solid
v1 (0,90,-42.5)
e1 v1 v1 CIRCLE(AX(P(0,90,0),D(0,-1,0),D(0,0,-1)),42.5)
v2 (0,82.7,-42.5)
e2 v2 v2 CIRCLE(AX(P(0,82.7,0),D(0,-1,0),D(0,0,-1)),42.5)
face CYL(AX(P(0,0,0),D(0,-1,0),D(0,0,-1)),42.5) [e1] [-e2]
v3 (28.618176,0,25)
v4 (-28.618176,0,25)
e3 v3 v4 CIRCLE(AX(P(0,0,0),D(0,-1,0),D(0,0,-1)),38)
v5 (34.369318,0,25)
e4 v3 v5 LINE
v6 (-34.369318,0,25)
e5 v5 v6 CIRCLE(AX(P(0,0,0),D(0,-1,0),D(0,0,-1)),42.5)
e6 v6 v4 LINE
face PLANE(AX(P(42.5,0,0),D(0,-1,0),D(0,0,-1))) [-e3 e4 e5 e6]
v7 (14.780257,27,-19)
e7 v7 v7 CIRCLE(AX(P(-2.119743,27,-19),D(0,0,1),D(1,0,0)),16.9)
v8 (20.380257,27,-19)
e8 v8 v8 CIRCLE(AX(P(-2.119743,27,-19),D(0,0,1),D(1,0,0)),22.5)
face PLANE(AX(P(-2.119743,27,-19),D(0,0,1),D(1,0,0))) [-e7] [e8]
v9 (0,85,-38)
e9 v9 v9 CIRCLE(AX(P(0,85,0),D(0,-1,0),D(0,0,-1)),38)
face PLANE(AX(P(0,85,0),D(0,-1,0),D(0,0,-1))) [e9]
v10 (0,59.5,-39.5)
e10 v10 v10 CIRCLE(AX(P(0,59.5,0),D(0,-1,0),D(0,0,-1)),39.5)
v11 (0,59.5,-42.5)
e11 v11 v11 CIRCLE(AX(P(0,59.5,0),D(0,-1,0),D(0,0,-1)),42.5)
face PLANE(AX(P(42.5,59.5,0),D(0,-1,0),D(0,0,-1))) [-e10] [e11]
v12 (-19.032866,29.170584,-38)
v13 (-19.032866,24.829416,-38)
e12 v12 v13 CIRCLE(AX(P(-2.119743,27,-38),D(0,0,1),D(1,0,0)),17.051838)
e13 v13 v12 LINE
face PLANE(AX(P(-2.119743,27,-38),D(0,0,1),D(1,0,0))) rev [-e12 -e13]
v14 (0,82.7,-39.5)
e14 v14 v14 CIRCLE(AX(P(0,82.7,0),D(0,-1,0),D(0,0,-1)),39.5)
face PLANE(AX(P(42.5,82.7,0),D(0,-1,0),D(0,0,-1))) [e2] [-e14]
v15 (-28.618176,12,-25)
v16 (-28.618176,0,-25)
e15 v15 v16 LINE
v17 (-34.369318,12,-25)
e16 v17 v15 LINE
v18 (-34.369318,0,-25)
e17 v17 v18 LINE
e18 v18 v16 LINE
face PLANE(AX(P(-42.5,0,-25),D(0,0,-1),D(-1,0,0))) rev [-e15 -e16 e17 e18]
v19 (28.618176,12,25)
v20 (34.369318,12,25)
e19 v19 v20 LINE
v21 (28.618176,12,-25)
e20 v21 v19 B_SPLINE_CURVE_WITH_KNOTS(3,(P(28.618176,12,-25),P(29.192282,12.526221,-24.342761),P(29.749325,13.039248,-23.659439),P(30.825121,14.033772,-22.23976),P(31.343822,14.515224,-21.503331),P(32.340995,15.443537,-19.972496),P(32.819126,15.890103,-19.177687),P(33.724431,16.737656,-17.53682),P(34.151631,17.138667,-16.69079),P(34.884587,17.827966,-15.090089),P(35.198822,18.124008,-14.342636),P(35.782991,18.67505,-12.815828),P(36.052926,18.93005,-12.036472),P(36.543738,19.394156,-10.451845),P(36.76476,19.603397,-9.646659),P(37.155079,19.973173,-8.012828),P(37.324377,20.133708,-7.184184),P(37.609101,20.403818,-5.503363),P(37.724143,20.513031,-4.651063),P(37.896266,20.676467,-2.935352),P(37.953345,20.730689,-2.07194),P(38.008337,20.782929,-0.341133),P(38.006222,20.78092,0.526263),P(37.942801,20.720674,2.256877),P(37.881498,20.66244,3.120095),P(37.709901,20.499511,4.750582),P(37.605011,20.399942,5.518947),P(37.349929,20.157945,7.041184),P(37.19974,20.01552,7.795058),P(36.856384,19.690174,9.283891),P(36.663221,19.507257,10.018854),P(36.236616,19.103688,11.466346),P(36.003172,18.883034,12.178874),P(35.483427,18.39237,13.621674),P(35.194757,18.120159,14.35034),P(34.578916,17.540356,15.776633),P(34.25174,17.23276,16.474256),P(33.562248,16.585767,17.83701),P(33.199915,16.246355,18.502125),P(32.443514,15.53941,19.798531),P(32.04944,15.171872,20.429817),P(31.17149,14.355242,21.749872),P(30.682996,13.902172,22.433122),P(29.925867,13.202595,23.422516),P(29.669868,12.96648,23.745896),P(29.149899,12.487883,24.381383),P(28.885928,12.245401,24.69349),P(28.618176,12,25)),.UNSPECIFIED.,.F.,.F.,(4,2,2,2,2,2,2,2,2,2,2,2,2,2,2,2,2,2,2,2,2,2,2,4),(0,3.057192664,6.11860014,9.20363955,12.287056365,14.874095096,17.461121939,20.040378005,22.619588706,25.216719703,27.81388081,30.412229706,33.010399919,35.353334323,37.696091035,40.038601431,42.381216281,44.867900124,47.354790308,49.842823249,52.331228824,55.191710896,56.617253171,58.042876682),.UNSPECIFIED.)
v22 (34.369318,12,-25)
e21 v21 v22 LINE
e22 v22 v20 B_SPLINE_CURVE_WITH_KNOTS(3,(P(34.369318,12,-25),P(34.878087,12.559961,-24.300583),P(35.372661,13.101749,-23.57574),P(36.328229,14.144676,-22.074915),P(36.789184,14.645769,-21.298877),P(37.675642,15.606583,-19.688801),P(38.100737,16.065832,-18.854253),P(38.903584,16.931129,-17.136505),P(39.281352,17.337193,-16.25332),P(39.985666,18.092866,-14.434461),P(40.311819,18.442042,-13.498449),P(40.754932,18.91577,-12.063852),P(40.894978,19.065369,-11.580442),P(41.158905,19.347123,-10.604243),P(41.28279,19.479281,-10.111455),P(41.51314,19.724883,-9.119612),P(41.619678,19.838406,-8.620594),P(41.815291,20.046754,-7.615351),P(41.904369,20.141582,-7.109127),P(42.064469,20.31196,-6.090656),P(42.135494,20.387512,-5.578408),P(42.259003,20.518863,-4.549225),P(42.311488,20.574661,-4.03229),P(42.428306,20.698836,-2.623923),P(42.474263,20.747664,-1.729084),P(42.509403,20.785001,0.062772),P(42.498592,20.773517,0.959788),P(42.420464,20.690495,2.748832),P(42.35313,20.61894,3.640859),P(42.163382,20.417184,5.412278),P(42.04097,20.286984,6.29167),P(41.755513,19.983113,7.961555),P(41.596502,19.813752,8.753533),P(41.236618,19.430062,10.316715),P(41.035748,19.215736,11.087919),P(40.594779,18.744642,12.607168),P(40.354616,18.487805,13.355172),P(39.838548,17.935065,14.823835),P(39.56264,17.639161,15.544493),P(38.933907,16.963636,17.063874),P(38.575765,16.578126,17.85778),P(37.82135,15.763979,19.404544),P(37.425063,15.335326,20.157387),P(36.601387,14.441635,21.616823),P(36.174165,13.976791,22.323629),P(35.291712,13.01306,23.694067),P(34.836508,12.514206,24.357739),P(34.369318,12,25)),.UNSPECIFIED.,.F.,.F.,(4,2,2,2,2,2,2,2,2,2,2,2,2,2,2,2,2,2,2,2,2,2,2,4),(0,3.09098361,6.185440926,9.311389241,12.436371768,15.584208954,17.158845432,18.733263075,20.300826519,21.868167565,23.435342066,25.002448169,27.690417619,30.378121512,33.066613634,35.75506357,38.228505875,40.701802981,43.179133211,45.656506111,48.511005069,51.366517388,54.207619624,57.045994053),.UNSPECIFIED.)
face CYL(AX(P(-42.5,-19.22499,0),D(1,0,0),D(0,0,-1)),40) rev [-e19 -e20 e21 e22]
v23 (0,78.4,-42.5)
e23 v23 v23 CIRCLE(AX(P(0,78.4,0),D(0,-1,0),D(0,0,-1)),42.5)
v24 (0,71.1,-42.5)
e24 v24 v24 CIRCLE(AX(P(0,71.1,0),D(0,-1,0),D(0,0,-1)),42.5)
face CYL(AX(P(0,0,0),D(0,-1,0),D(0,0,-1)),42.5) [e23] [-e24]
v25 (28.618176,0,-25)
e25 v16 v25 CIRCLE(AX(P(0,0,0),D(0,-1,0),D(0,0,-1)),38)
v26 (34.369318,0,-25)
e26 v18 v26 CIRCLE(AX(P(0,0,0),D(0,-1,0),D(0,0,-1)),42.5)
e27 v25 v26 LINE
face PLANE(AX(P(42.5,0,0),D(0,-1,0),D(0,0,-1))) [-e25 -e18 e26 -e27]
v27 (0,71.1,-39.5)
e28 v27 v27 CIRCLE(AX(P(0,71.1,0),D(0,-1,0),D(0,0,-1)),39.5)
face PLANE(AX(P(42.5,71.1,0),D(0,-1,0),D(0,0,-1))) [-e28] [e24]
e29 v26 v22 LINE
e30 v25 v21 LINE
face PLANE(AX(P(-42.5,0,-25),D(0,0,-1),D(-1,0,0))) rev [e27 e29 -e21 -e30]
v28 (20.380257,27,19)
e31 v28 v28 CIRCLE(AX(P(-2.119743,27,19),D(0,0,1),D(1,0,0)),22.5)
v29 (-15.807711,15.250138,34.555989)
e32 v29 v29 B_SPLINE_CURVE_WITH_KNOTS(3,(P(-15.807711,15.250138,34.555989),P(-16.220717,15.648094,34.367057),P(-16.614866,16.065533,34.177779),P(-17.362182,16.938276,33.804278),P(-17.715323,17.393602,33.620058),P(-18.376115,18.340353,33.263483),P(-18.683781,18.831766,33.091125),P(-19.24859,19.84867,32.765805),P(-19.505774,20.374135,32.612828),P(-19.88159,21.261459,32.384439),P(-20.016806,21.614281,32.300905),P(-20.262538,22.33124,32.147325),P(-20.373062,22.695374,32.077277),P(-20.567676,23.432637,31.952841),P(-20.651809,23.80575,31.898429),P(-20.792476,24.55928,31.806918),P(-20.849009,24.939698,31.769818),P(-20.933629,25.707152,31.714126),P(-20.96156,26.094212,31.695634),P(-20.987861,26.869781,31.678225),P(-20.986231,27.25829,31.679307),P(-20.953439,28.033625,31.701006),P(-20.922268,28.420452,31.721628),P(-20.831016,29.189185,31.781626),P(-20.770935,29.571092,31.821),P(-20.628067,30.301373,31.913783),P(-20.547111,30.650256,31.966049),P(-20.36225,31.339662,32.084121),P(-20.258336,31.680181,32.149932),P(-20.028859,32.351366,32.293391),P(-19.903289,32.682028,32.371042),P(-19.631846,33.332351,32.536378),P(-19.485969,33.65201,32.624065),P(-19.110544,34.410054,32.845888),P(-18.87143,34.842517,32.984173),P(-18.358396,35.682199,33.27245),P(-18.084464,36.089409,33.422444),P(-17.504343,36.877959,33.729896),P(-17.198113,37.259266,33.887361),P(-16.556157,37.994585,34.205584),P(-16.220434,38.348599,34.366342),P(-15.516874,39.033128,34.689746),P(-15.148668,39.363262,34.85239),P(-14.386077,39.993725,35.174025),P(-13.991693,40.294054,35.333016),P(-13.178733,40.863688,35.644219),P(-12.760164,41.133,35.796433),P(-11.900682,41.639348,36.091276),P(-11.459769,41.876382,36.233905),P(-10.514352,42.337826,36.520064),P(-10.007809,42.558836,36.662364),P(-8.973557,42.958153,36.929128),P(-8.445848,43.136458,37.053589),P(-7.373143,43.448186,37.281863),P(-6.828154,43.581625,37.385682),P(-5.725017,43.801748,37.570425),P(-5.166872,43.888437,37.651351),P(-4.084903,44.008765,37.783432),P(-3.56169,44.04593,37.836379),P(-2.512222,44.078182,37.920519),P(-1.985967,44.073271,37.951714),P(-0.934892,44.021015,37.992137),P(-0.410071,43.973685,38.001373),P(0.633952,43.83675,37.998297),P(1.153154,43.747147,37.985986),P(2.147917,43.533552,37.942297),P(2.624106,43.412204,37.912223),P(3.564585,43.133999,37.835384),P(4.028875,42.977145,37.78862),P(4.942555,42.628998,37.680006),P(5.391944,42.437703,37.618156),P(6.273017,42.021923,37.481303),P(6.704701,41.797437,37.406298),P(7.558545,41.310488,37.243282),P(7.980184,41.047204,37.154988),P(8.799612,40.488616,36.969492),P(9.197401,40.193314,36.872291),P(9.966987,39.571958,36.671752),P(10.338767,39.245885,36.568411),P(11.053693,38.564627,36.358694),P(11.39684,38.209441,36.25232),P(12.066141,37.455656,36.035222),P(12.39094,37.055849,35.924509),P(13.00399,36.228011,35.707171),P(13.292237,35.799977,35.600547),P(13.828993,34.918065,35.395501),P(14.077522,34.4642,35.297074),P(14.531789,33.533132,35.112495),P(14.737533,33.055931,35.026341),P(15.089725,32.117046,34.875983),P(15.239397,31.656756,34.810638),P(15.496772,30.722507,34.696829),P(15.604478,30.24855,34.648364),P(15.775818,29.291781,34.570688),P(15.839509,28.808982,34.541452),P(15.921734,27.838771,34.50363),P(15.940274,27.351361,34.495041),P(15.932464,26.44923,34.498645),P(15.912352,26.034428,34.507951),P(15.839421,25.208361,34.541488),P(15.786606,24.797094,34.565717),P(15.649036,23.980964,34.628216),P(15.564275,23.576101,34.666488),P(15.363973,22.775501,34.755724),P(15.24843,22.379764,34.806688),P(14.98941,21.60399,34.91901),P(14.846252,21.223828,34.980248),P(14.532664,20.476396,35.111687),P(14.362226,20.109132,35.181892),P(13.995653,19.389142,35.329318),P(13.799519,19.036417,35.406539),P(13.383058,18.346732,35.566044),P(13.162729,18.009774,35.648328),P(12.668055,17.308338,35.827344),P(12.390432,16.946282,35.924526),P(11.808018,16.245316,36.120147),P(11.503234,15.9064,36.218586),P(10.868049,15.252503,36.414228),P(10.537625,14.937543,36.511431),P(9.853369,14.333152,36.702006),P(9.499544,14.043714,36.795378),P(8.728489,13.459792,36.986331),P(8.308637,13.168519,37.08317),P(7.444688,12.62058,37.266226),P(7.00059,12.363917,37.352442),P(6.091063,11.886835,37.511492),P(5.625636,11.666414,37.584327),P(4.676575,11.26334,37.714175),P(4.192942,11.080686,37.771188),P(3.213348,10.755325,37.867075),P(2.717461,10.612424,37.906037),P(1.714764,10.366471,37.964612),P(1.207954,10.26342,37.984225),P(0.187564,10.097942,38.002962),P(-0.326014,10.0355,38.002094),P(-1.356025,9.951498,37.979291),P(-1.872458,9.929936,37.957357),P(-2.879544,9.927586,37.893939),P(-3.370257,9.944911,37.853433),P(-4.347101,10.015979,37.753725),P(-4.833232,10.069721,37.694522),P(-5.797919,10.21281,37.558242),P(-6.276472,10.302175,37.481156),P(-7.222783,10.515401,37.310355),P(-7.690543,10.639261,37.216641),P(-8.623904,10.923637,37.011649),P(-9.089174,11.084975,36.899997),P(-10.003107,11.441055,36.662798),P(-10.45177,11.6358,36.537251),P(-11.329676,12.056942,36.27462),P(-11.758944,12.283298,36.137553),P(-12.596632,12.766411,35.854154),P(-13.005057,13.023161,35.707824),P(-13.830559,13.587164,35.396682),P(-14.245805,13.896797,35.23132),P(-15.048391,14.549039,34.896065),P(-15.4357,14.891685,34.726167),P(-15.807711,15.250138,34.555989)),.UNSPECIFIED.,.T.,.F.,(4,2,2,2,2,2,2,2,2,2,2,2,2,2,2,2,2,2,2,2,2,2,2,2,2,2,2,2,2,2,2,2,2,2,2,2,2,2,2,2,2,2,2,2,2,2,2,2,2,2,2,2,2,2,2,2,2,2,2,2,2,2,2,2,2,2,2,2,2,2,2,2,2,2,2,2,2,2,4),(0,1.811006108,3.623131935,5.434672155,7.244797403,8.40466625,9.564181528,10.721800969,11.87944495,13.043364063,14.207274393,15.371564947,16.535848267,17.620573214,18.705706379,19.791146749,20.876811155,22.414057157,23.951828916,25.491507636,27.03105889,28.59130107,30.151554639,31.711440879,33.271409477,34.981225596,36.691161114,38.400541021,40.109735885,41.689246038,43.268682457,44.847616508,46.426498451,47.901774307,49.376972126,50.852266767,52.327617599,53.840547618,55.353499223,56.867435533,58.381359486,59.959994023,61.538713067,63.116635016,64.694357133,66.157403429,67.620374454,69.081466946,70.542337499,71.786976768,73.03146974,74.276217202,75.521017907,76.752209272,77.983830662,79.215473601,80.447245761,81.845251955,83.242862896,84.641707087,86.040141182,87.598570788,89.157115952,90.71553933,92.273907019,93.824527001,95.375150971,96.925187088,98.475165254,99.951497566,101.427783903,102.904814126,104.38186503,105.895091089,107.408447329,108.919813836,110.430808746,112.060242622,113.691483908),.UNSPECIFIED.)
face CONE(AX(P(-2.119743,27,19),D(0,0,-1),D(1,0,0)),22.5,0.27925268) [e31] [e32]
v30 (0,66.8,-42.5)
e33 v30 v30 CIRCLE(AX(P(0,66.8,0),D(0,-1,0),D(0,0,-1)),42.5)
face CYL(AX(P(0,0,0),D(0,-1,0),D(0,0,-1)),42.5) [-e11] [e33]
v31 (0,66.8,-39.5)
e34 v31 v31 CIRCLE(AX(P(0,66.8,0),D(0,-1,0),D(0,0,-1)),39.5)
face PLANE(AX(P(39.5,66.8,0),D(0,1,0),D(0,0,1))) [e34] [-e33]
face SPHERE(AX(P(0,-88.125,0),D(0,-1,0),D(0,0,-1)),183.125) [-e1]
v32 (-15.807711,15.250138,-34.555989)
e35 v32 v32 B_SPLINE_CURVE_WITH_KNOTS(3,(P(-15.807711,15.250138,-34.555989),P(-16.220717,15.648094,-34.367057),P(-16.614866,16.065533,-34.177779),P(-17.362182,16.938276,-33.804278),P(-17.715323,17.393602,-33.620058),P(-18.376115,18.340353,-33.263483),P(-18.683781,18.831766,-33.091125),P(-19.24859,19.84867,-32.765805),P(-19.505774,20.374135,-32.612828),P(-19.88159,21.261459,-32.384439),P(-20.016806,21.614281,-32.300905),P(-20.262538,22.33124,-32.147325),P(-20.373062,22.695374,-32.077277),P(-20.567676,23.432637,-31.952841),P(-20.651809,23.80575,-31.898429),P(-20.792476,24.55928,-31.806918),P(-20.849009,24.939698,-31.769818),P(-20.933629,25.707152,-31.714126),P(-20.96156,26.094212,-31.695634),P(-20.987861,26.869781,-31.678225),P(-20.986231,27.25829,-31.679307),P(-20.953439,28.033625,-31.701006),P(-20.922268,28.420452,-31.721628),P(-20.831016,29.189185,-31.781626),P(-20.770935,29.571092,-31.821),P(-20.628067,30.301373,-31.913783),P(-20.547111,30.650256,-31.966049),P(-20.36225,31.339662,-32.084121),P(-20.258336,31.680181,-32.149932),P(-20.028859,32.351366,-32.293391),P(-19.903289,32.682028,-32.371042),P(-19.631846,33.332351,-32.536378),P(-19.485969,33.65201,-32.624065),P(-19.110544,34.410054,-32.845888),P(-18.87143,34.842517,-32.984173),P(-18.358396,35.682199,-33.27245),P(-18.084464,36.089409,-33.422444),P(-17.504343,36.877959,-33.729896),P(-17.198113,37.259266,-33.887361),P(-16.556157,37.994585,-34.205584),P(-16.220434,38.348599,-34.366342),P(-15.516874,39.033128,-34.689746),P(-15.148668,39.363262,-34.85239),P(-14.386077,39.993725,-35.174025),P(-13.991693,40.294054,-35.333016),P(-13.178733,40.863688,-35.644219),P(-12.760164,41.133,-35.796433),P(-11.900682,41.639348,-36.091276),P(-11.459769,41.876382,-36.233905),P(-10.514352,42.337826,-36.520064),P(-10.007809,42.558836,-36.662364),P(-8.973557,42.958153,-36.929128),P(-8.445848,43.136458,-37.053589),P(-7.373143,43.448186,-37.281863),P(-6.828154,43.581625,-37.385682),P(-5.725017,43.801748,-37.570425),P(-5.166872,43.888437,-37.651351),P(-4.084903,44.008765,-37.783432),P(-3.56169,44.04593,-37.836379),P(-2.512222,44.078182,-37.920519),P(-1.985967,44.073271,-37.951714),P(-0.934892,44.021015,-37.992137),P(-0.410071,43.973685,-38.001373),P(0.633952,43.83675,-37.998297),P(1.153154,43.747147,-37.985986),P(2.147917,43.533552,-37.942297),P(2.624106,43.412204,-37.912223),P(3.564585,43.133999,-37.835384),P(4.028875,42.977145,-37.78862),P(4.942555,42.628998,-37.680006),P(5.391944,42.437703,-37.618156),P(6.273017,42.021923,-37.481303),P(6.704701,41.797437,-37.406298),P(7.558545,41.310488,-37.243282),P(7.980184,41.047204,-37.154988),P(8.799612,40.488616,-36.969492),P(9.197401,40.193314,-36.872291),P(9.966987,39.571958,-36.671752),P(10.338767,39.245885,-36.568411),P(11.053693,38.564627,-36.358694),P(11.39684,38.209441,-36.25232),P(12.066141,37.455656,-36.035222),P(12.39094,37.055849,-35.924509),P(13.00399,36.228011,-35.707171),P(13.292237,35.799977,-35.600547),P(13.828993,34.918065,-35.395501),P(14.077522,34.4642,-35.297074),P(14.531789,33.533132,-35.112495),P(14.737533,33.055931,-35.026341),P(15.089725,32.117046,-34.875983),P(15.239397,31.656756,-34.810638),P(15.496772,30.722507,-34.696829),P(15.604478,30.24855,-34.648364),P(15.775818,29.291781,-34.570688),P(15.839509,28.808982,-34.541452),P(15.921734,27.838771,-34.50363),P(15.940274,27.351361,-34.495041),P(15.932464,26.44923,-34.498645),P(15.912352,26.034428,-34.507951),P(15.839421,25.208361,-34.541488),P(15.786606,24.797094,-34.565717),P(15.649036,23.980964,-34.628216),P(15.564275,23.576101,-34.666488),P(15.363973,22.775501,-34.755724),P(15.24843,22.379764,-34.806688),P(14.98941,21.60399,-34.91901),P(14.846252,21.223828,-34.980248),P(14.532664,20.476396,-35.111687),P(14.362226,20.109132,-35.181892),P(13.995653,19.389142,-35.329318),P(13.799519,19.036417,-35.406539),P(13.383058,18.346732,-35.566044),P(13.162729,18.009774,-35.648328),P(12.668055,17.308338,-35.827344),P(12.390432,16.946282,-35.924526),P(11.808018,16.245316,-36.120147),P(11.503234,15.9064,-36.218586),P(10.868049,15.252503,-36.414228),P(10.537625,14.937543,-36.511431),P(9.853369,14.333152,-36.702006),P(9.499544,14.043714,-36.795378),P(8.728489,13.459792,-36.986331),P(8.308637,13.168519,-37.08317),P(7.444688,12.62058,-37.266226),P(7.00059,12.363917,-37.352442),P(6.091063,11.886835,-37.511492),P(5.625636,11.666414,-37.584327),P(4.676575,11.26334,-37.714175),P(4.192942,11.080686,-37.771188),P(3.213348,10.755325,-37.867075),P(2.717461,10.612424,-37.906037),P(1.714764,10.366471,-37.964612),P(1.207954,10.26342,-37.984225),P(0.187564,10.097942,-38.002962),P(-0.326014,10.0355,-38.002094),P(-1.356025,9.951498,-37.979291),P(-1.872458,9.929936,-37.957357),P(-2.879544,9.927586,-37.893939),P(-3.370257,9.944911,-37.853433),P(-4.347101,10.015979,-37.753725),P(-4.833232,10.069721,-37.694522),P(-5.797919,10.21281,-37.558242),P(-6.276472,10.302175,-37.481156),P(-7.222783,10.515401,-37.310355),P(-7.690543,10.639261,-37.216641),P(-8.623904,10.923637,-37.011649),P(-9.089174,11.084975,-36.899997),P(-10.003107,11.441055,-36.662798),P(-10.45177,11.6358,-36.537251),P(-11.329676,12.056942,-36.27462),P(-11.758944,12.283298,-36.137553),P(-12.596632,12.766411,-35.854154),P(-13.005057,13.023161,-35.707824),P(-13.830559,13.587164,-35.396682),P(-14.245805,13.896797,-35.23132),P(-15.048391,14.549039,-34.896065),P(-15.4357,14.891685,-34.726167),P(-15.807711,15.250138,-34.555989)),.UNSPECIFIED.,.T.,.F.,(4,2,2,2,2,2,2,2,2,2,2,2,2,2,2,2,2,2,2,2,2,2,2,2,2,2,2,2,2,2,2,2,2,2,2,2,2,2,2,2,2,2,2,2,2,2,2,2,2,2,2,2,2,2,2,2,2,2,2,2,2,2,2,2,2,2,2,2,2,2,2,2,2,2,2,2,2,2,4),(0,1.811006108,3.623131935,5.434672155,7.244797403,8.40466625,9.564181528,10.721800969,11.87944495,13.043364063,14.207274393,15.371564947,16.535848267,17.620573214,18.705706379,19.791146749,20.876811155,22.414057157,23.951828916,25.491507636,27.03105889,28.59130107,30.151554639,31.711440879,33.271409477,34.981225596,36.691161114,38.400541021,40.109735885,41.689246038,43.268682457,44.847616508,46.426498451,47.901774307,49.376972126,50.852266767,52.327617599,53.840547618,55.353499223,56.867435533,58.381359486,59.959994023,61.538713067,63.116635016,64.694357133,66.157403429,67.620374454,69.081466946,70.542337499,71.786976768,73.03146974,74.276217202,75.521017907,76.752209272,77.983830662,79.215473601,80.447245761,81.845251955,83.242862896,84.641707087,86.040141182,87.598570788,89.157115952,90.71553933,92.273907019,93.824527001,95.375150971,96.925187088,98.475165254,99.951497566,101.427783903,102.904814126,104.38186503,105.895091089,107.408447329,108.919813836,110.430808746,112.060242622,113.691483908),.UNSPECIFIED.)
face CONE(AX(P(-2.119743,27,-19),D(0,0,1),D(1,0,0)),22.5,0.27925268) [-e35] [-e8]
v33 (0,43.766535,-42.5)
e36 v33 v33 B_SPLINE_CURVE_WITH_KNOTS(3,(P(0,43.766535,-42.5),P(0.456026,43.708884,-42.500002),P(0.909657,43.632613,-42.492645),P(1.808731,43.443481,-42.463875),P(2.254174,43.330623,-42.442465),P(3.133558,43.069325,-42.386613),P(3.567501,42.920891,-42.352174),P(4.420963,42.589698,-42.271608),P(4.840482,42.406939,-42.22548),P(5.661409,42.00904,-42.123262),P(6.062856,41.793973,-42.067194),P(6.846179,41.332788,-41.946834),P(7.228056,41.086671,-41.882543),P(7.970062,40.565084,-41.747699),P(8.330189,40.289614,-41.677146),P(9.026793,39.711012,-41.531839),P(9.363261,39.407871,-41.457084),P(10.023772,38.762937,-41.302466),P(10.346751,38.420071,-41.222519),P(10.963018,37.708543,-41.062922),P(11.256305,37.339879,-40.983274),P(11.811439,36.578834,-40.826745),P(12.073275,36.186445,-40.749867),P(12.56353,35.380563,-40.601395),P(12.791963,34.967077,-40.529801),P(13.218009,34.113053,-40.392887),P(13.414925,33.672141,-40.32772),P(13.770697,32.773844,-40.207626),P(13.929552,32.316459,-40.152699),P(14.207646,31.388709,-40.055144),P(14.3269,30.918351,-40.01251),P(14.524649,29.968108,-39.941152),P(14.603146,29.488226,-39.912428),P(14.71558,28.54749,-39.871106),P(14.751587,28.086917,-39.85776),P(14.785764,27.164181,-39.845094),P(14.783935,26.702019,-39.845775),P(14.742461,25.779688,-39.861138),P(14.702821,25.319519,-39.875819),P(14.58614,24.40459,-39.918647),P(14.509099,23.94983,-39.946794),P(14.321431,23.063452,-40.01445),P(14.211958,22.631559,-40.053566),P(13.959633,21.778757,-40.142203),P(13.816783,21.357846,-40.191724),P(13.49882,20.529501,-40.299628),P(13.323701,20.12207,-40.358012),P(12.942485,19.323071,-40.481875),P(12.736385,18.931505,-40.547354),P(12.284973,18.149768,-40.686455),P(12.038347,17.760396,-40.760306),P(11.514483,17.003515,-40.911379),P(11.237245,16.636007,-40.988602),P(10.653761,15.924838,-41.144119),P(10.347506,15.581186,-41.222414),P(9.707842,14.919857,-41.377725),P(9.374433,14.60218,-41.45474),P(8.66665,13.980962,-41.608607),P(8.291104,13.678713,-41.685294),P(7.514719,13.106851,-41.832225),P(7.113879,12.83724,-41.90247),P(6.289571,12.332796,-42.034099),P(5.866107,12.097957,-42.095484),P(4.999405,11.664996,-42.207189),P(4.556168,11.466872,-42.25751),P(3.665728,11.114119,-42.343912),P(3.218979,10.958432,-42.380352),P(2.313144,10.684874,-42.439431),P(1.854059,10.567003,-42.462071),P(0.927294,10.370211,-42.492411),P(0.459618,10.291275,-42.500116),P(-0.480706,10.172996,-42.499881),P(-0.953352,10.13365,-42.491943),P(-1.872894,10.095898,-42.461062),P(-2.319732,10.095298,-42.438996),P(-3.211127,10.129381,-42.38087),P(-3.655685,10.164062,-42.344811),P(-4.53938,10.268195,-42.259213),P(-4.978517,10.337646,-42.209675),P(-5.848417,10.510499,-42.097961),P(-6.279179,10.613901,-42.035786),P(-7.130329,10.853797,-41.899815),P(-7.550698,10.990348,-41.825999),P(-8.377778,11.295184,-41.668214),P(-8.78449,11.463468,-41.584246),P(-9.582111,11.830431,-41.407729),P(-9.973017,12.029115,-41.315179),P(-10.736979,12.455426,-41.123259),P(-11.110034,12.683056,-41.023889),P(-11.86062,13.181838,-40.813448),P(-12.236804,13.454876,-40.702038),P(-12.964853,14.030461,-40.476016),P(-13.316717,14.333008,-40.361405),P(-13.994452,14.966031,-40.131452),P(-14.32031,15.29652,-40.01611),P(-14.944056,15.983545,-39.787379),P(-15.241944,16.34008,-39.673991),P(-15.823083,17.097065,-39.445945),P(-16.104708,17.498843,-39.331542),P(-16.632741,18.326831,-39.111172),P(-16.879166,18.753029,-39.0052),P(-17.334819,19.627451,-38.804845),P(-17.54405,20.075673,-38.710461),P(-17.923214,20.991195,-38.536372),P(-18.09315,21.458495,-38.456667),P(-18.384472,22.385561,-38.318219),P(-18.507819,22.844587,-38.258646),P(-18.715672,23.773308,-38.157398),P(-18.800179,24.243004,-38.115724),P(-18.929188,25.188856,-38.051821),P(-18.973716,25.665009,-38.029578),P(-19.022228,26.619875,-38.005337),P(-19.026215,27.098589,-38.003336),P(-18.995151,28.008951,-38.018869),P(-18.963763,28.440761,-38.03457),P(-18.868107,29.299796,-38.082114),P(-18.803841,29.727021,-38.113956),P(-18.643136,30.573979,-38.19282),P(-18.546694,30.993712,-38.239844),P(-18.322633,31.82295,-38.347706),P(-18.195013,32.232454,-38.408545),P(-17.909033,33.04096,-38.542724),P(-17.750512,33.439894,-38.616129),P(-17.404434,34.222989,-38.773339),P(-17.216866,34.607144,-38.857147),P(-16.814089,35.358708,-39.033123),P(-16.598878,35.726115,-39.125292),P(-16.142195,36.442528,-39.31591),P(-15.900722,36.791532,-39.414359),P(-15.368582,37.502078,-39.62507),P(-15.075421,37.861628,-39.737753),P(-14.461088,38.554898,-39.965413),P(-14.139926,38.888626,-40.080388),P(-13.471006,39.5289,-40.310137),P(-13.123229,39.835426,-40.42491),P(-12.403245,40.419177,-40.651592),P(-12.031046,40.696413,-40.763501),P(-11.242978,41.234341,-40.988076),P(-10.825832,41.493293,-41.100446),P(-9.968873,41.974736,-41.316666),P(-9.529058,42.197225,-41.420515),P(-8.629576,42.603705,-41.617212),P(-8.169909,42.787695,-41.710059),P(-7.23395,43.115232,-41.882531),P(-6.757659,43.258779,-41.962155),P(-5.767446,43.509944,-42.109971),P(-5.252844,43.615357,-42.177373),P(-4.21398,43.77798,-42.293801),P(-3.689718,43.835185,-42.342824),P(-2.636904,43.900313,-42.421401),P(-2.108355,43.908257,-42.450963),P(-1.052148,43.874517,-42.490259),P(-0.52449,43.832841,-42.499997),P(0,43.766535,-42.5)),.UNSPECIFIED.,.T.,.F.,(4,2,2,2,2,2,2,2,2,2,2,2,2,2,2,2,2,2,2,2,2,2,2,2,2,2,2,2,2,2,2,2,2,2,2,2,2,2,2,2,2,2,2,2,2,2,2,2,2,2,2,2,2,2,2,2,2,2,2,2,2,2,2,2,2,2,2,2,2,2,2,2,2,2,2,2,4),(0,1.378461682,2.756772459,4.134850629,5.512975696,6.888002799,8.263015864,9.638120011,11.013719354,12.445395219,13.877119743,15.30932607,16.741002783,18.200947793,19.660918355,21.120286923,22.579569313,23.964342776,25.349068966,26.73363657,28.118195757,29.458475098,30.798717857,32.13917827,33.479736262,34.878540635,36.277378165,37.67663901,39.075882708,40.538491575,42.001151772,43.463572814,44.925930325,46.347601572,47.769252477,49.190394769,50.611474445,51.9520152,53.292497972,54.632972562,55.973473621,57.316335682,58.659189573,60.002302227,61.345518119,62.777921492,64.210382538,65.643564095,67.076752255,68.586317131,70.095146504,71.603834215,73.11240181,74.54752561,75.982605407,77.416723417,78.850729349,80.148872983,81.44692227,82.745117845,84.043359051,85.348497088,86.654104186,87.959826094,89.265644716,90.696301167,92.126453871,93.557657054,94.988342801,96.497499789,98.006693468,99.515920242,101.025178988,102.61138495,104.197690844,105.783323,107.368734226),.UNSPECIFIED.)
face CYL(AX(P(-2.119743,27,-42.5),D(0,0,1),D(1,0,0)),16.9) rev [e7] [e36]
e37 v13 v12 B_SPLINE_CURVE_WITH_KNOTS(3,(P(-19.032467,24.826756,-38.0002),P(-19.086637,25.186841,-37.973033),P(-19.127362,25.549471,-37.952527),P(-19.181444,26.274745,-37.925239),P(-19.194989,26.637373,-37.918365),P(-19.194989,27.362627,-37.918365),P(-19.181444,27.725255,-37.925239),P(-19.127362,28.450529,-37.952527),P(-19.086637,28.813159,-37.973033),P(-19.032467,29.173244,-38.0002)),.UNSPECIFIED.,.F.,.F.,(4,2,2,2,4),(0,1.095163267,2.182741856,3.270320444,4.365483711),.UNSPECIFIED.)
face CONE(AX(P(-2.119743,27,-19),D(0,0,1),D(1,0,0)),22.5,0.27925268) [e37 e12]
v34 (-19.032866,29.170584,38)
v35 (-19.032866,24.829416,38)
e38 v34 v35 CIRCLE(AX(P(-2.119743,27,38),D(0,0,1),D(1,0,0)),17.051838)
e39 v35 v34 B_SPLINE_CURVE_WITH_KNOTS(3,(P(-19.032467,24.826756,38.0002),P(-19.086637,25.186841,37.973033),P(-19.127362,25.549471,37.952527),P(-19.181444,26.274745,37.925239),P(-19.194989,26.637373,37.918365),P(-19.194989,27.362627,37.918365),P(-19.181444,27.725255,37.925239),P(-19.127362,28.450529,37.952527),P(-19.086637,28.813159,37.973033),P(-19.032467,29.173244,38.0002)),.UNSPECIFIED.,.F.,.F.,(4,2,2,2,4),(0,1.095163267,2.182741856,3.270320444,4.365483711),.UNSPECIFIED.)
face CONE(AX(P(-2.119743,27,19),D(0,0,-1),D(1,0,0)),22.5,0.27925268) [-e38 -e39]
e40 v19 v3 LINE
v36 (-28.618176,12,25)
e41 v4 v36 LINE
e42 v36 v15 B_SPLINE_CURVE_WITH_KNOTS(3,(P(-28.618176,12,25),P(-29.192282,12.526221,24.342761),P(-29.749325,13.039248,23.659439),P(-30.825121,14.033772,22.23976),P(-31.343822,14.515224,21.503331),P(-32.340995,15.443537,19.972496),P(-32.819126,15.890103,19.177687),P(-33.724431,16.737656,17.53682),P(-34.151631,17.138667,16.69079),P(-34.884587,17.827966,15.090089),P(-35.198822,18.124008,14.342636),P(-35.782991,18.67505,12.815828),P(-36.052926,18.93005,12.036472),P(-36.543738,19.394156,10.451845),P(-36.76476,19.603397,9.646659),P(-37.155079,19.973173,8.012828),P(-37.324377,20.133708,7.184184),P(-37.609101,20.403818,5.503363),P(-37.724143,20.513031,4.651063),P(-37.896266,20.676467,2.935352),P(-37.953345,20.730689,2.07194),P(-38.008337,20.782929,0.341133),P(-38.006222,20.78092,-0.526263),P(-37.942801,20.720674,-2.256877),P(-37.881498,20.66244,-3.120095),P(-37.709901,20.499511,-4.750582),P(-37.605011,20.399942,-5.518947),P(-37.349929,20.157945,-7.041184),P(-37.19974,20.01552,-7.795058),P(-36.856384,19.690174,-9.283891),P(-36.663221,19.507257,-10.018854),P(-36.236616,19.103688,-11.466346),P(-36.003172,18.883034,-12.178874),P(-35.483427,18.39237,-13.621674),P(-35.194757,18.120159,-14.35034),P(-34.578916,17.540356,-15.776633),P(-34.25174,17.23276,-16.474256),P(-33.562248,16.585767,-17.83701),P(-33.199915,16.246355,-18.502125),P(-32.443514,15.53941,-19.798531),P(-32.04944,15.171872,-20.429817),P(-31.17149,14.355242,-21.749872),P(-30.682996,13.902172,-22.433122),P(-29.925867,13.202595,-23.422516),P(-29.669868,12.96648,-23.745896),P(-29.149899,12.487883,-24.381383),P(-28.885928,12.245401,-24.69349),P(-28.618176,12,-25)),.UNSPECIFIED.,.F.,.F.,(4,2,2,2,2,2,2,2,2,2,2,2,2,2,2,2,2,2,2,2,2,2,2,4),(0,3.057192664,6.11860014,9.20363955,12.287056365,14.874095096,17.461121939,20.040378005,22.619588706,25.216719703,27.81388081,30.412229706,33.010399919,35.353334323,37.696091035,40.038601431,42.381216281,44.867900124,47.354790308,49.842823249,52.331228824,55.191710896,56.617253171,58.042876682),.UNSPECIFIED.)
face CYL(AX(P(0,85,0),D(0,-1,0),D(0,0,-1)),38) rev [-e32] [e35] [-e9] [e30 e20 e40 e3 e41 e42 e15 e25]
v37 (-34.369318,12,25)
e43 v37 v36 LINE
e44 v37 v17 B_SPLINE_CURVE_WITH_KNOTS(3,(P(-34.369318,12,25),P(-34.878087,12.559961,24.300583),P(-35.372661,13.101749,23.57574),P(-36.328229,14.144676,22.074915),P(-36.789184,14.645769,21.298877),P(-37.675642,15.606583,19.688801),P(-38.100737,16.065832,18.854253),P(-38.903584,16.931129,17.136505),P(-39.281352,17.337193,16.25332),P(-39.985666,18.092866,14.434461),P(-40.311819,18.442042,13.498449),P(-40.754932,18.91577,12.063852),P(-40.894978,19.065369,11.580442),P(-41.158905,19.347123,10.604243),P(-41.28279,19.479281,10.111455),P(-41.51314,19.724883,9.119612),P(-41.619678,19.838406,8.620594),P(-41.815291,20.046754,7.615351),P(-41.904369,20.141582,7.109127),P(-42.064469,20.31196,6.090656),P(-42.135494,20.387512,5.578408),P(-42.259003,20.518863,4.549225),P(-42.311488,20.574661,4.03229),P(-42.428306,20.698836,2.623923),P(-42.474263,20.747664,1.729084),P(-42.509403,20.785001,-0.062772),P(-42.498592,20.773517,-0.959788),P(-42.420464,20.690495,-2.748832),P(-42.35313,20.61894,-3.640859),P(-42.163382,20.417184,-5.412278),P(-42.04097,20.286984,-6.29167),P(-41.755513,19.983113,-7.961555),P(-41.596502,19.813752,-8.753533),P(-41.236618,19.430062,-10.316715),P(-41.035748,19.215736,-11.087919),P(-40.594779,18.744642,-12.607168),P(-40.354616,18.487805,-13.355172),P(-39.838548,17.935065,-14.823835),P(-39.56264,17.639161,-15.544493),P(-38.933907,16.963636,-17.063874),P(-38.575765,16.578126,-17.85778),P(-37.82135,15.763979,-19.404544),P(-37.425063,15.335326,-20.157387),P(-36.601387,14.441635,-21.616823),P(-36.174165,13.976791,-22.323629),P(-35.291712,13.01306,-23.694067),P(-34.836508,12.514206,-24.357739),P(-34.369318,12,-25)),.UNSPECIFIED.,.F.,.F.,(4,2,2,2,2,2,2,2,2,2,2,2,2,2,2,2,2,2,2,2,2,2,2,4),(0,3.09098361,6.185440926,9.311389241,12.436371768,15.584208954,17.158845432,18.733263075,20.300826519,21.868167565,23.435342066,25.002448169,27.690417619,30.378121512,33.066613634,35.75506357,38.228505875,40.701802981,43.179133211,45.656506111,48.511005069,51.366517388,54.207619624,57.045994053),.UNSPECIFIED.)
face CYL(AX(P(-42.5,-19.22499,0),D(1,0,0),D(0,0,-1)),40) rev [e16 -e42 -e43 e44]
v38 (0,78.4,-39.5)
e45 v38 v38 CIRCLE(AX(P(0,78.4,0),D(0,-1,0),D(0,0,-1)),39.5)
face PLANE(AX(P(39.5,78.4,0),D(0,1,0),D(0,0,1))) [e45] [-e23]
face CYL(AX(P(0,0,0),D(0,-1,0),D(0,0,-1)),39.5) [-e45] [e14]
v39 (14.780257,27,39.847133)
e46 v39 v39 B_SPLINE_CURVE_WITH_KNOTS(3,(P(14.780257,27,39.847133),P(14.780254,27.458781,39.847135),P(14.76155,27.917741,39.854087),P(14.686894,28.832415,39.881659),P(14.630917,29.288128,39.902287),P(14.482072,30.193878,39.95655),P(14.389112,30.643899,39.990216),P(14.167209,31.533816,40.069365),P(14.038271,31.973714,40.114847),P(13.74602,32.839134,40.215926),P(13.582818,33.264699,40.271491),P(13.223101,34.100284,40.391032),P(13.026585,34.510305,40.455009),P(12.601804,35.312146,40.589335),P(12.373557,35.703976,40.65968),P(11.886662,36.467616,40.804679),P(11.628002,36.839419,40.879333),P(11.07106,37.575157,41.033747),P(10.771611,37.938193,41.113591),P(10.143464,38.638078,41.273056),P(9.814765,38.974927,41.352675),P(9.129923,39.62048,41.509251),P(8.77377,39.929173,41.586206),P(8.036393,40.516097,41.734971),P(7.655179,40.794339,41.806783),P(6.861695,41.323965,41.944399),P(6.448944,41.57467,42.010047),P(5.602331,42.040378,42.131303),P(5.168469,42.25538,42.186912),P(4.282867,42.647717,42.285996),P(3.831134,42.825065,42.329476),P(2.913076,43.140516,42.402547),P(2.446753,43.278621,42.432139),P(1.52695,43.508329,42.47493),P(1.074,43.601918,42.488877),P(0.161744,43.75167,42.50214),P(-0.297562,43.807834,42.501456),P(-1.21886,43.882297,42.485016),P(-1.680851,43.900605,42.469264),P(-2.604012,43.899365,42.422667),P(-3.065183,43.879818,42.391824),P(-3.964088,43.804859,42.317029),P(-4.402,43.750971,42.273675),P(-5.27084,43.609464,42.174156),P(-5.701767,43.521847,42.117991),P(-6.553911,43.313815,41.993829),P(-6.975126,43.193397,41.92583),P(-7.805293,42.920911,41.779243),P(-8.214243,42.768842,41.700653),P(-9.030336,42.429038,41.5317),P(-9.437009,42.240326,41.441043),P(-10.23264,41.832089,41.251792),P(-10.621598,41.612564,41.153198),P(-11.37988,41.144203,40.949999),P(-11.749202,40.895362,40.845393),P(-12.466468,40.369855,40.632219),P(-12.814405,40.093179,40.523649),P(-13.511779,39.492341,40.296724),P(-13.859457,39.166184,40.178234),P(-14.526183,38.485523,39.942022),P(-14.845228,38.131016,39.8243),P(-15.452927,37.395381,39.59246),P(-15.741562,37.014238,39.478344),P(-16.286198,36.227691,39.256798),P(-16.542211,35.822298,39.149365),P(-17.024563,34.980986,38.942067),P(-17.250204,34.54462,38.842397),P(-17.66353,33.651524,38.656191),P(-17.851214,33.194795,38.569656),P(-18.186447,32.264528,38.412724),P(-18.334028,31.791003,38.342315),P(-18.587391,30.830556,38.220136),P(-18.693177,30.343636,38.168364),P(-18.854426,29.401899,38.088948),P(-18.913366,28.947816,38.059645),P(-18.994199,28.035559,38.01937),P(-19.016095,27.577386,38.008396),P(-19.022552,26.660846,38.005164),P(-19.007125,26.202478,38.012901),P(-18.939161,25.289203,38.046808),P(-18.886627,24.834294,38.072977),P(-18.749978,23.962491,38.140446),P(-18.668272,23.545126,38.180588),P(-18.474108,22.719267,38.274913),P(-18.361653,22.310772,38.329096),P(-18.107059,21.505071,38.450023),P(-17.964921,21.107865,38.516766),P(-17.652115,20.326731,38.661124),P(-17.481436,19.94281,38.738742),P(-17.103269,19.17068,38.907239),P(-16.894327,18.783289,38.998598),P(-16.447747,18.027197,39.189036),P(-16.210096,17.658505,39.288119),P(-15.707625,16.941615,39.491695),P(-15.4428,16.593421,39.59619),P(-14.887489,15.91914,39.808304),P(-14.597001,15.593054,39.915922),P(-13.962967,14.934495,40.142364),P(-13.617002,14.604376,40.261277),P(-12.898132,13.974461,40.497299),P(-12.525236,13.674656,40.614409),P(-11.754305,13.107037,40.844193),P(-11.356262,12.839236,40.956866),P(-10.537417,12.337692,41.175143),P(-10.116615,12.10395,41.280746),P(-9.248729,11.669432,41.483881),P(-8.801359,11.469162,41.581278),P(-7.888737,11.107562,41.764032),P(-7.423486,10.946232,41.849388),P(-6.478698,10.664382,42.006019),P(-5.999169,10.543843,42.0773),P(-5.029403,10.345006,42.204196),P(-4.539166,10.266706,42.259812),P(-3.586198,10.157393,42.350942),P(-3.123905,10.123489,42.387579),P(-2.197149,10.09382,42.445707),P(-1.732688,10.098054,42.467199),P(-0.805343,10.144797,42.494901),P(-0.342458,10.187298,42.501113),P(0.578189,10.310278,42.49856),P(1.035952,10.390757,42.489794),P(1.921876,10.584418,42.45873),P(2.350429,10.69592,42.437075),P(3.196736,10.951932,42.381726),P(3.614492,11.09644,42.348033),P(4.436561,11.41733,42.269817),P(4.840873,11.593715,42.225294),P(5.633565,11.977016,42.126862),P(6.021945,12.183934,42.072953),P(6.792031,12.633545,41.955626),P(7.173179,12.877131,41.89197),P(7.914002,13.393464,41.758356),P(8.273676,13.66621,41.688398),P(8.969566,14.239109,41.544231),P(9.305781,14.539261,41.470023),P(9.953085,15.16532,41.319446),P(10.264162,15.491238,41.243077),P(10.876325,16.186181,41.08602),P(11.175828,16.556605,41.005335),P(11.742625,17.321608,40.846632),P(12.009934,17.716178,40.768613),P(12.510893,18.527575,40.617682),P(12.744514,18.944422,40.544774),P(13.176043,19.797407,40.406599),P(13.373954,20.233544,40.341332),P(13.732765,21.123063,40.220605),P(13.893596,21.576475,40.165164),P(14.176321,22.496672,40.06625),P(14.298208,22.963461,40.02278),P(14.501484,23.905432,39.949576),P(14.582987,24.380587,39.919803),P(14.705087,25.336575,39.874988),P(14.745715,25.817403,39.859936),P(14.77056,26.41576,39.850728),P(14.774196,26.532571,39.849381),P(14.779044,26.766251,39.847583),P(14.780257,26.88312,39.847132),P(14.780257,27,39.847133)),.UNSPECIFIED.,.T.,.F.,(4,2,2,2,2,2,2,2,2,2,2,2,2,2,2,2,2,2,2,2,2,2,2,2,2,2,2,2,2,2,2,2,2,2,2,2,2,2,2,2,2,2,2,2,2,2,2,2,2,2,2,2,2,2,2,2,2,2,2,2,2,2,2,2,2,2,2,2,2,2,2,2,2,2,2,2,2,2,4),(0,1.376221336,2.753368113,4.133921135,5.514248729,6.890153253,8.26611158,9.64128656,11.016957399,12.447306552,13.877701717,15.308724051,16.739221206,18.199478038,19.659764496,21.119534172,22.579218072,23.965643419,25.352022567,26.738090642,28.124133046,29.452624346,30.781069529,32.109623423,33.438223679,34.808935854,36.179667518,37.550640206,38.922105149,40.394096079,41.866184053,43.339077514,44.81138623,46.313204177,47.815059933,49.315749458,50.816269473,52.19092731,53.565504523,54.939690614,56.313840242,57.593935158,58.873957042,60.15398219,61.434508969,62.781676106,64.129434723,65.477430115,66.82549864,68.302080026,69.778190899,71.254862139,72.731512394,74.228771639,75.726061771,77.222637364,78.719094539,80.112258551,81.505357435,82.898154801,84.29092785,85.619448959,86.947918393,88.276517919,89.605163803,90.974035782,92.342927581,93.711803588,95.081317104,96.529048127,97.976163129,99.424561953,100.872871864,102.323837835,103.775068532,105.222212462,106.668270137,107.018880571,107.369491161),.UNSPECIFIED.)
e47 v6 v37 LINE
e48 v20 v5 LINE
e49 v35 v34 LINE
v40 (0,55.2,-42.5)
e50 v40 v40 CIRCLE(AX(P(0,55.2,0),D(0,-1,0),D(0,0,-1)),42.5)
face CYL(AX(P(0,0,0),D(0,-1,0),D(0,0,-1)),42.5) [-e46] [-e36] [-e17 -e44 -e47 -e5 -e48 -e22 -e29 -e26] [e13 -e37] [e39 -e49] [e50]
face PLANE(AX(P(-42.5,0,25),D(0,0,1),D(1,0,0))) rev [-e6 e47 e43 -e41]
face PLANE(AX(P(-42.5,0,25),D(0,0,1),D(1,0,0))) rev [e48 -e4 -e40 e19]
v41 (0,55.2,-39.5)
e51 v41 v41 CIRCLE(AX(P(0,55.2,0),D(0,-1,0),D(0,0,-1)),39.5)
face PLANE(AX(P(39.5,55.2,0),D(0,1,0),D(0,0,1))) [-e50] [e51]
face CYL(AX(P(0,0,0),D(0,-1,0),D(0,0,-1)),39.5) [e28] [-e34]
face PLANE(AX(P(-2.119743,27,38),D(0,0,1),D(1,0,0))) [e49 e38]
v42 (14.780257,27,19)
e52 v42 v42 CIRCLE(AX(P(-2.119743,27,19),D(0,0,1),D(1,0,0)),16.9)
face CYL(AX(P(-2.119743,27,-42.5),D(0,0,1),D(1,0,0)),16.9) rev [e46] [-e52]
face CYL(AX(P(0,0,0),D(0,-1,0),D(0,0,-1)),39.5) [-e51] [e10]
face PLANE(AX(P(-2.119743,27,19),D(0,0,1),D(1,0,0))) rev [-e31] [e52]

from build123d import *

# Parameters (mm, degrees)
KUBBE1_FACE_RADIUS          = 42.5
KUBBE1_HEIGHT               = 5
KES_EKSTR_ZYON1_DEPTH       = 113.41663578
KES_EKSTR_ZYON1_DEPTH_BACK  = 113.41663578
IZIM2_R                     = 16.9
IZIM3_R                     = 38
KES_EKSTR_ZYON3_DEPTH       = 85
KES_EKSTR_ZYON4_DEPTH       = 113.416635855
KES_EKSTR_ZYON4_DEPTH_BACK  = 113.416635855
Y_KSEKLIK_EKSTR_ZYON1_START = 19
IZIM5_R                     = 22.5
Y_KSEKLIK_EKSTR_ZYON1_DEPTH = 19
Y_KSEKLIK_EKSTR_ZYON1_TAPER = 16
Y_KSEKLIK_EKSTR_ZYON2_START = -19
IZIM9_R                     = 22.5
Y_KSEKLIK_EKSTR_ZYON2_DEPTH = 19
Y_KSEKLIK_EKSTR_ZYON2_DRAFT = -16
KES_EKSTR_ZYON6_DEPTH       = 132.573173651
KES_EKSTR_ZYON6_DEPTH_BACK  = 132.573173651
IZIM10_R                    = 16.9


with BuildPart() as part:
    # Çizim1 → Döndür1 (revolve)
    with BuildSketch(Plane.XY, mode=Mode.PRIVATE) as d_nd_r1_sk:
        Polygon((0, 0), (0, 90), (42.5, 90), (42.5, 82.7), (39.5, 82.7), (39.5, 78.4), (42.5, 78.4), (42.5, 71.1), (39.5, 71.1), (39.5, 66.8), (42.5, 66.8), (42.5, 59.5), (39.5, 59.5), (39.5, 55.2), (42.5, 55.2), (42.5, 0), align=None)
    revolve(d_nd_r1_sk.sketch.rotate(Axis((0, 0, 0), (0, 1, 0)), 90), axis=Axis((0, 0, 0), (0, 1, 0)))

    # Kubbe1: a dome of height H over a round flat face of radius A is a cap of a sphere of radius (A * A + H * H) / (2 * H)
    kubbe1_r = (KUBBE1_FACE_RADIUS * KUBBE1_FACE_RADIUS + KUBBE1_HEIGHT * KUBBE1_HEIGHT) / (2 * KUBBE1_HEIGHT)
    kubbe1_base = Plane((0, 90, 0), z_dir=(0, 1, 0))
    with Locations(kubbe1_base.offset(KUBBE1_HEIGHT - kubbe1_r)):
        kubbe1_ball = Sphere(kubbe1_r, mode=Mode.PRIVATE)
    add(split(kubbe1_ball, bisect_by=kubbe1_base, keep=Keep.TOP, mode=Mode.PRIVATE))

    # Çizim2 → Kes-Ekstrüzyon1 (cut, two sides: drawn at the far end of the back side and taken through both)
    with BuildSketch(Plane.XY.offset(-KES_EKSTR_ZYON1_DEPTH_BACK)):
        with Locations((-2.119743269, 27)):
            Circle(IZIM2_R)
    extrude(amount=KES_EKSTR_ZYON1_DEPTH + KES_EKSTR_ZYON1_DEPTH_BACK, mode=Mode.SUBTRACT)

    # Çizim3 → Kes-Ekstrüzyon3 (cut)
    with BuildSketch(Plane(origin=(0, 0, 0), x_dir=(-1, 0, 0), z_dir=(0, -1, 0))):
        with Locations(Location((0, 0, 0), (0, 0, 90))):
            Circle(IZIM3_R)
    extrude(amount=-KES_EKSTR_ZYON3_DEPTH, mode=Mode.SUBTRACT)

    # Çizim4 → Kes-Ekstrüzyon4 (cut, two sides: drawn at the far end of the back side and taken through both)
    with BuildSketch(Plane(origin=(0, 0, 0), x_dir=(0, 0, -1), z_dir=(1, 0, 0)).offset(-KES_EKSTR_ZYON4_DEPTH_BACK)):
        with BuildLine():
            Line((-25, 0), (-25, 12))
            ThreePointArc((-25, 12), (0, 20.775010008), (25, 12))
            Line((25, 12), (25, 0))
            Line((25, 0), (-25, 0))
        make_face()
    extrude(amount=KES_EKSTR_ZYON4_DEPTH + KES_EKSTR_ZYON4_DEPTH_BACK, mode=Mode.SUBTRACT)

    # Çizim5 → Yükseklik-Ekstrüzyon1 (add)
    with BuildSketch(Plane.XY.offset(Y_KSEKLIK_EKSTR_ZYON1_START)):
        with Locations((-2.119743269, 27)):
            Circle(IZIM5_R)
    extrude(amount=Y_KSEKLIK_EKSTR_ZYON1_DEPTH, taper=Y_KSEKLIK_EKSTR_ZYON1_TAPER)


with BuildPart() as y_kseklik_ekstr_zyon2_tool:
    # Çizim9 → Yükseklik-Ekstrüzyon2 (with draft: the straight prism first)
    with BuildSketch(Plane.XY.offset(Y_KSEKLIK_EKSTR_ZYON2_START)):
        with Locations((-2.119743269, 27)):
            Circle(IZIM9_R)
    extrude(amount=-Y_KSEKLIK_EKSTR_ZYON2_DEPTH)
    # Yükseklik-Ekstrüzyon2: the draft: its side faces are tilted about the plane it starts from
    y_kseklik_ekstr_zyon2_sides = [y_kseklik_ekstr_zyon2_tool.faces().sort_by_distance(p)[0] for p in [
        (-24.619743269, 27, -28.5),
    ]]
    draft(y_kseklik_ekstr_zyon2_sides, Plane.XY.offset(Y_KSEKLIK_EKSTR_ZYON2_START), Y_KSEKLIK_EKSTR_ZYON2_DRAFT)


with BuildPart() as part_1:
    add(part.part)

    # Yükseklik-Ekstrüzyon2: add y_kseklik_ekstr_zyon2_tool
    add(y_kseklik_ekstr_zyon2_tool.part)

    # Çizim10 → Kes-Ekstrüzyon6 (cut, two sides: drawn at the far end of the back side and taken through both)
    with BuildSketch(Plane(origin=(0, 0, -38), x_dir=(-1, 0, 0), z_dir=(0, 0, -1)).offset(-KES_EKSTR_ZYON6_DEPTH_BACK)):
        with Locations(Location((2.119743269, 27, 0), (0, 0, 180))):
            Circle(IZIM10_R)
    extrude(amount=KES_EKSTR_ZYON6_DEPTH + KES_EKSTR_ZYON6_DEPTH_BACK, mode=Mode.SUBTRACT)


solid = part_1.part
